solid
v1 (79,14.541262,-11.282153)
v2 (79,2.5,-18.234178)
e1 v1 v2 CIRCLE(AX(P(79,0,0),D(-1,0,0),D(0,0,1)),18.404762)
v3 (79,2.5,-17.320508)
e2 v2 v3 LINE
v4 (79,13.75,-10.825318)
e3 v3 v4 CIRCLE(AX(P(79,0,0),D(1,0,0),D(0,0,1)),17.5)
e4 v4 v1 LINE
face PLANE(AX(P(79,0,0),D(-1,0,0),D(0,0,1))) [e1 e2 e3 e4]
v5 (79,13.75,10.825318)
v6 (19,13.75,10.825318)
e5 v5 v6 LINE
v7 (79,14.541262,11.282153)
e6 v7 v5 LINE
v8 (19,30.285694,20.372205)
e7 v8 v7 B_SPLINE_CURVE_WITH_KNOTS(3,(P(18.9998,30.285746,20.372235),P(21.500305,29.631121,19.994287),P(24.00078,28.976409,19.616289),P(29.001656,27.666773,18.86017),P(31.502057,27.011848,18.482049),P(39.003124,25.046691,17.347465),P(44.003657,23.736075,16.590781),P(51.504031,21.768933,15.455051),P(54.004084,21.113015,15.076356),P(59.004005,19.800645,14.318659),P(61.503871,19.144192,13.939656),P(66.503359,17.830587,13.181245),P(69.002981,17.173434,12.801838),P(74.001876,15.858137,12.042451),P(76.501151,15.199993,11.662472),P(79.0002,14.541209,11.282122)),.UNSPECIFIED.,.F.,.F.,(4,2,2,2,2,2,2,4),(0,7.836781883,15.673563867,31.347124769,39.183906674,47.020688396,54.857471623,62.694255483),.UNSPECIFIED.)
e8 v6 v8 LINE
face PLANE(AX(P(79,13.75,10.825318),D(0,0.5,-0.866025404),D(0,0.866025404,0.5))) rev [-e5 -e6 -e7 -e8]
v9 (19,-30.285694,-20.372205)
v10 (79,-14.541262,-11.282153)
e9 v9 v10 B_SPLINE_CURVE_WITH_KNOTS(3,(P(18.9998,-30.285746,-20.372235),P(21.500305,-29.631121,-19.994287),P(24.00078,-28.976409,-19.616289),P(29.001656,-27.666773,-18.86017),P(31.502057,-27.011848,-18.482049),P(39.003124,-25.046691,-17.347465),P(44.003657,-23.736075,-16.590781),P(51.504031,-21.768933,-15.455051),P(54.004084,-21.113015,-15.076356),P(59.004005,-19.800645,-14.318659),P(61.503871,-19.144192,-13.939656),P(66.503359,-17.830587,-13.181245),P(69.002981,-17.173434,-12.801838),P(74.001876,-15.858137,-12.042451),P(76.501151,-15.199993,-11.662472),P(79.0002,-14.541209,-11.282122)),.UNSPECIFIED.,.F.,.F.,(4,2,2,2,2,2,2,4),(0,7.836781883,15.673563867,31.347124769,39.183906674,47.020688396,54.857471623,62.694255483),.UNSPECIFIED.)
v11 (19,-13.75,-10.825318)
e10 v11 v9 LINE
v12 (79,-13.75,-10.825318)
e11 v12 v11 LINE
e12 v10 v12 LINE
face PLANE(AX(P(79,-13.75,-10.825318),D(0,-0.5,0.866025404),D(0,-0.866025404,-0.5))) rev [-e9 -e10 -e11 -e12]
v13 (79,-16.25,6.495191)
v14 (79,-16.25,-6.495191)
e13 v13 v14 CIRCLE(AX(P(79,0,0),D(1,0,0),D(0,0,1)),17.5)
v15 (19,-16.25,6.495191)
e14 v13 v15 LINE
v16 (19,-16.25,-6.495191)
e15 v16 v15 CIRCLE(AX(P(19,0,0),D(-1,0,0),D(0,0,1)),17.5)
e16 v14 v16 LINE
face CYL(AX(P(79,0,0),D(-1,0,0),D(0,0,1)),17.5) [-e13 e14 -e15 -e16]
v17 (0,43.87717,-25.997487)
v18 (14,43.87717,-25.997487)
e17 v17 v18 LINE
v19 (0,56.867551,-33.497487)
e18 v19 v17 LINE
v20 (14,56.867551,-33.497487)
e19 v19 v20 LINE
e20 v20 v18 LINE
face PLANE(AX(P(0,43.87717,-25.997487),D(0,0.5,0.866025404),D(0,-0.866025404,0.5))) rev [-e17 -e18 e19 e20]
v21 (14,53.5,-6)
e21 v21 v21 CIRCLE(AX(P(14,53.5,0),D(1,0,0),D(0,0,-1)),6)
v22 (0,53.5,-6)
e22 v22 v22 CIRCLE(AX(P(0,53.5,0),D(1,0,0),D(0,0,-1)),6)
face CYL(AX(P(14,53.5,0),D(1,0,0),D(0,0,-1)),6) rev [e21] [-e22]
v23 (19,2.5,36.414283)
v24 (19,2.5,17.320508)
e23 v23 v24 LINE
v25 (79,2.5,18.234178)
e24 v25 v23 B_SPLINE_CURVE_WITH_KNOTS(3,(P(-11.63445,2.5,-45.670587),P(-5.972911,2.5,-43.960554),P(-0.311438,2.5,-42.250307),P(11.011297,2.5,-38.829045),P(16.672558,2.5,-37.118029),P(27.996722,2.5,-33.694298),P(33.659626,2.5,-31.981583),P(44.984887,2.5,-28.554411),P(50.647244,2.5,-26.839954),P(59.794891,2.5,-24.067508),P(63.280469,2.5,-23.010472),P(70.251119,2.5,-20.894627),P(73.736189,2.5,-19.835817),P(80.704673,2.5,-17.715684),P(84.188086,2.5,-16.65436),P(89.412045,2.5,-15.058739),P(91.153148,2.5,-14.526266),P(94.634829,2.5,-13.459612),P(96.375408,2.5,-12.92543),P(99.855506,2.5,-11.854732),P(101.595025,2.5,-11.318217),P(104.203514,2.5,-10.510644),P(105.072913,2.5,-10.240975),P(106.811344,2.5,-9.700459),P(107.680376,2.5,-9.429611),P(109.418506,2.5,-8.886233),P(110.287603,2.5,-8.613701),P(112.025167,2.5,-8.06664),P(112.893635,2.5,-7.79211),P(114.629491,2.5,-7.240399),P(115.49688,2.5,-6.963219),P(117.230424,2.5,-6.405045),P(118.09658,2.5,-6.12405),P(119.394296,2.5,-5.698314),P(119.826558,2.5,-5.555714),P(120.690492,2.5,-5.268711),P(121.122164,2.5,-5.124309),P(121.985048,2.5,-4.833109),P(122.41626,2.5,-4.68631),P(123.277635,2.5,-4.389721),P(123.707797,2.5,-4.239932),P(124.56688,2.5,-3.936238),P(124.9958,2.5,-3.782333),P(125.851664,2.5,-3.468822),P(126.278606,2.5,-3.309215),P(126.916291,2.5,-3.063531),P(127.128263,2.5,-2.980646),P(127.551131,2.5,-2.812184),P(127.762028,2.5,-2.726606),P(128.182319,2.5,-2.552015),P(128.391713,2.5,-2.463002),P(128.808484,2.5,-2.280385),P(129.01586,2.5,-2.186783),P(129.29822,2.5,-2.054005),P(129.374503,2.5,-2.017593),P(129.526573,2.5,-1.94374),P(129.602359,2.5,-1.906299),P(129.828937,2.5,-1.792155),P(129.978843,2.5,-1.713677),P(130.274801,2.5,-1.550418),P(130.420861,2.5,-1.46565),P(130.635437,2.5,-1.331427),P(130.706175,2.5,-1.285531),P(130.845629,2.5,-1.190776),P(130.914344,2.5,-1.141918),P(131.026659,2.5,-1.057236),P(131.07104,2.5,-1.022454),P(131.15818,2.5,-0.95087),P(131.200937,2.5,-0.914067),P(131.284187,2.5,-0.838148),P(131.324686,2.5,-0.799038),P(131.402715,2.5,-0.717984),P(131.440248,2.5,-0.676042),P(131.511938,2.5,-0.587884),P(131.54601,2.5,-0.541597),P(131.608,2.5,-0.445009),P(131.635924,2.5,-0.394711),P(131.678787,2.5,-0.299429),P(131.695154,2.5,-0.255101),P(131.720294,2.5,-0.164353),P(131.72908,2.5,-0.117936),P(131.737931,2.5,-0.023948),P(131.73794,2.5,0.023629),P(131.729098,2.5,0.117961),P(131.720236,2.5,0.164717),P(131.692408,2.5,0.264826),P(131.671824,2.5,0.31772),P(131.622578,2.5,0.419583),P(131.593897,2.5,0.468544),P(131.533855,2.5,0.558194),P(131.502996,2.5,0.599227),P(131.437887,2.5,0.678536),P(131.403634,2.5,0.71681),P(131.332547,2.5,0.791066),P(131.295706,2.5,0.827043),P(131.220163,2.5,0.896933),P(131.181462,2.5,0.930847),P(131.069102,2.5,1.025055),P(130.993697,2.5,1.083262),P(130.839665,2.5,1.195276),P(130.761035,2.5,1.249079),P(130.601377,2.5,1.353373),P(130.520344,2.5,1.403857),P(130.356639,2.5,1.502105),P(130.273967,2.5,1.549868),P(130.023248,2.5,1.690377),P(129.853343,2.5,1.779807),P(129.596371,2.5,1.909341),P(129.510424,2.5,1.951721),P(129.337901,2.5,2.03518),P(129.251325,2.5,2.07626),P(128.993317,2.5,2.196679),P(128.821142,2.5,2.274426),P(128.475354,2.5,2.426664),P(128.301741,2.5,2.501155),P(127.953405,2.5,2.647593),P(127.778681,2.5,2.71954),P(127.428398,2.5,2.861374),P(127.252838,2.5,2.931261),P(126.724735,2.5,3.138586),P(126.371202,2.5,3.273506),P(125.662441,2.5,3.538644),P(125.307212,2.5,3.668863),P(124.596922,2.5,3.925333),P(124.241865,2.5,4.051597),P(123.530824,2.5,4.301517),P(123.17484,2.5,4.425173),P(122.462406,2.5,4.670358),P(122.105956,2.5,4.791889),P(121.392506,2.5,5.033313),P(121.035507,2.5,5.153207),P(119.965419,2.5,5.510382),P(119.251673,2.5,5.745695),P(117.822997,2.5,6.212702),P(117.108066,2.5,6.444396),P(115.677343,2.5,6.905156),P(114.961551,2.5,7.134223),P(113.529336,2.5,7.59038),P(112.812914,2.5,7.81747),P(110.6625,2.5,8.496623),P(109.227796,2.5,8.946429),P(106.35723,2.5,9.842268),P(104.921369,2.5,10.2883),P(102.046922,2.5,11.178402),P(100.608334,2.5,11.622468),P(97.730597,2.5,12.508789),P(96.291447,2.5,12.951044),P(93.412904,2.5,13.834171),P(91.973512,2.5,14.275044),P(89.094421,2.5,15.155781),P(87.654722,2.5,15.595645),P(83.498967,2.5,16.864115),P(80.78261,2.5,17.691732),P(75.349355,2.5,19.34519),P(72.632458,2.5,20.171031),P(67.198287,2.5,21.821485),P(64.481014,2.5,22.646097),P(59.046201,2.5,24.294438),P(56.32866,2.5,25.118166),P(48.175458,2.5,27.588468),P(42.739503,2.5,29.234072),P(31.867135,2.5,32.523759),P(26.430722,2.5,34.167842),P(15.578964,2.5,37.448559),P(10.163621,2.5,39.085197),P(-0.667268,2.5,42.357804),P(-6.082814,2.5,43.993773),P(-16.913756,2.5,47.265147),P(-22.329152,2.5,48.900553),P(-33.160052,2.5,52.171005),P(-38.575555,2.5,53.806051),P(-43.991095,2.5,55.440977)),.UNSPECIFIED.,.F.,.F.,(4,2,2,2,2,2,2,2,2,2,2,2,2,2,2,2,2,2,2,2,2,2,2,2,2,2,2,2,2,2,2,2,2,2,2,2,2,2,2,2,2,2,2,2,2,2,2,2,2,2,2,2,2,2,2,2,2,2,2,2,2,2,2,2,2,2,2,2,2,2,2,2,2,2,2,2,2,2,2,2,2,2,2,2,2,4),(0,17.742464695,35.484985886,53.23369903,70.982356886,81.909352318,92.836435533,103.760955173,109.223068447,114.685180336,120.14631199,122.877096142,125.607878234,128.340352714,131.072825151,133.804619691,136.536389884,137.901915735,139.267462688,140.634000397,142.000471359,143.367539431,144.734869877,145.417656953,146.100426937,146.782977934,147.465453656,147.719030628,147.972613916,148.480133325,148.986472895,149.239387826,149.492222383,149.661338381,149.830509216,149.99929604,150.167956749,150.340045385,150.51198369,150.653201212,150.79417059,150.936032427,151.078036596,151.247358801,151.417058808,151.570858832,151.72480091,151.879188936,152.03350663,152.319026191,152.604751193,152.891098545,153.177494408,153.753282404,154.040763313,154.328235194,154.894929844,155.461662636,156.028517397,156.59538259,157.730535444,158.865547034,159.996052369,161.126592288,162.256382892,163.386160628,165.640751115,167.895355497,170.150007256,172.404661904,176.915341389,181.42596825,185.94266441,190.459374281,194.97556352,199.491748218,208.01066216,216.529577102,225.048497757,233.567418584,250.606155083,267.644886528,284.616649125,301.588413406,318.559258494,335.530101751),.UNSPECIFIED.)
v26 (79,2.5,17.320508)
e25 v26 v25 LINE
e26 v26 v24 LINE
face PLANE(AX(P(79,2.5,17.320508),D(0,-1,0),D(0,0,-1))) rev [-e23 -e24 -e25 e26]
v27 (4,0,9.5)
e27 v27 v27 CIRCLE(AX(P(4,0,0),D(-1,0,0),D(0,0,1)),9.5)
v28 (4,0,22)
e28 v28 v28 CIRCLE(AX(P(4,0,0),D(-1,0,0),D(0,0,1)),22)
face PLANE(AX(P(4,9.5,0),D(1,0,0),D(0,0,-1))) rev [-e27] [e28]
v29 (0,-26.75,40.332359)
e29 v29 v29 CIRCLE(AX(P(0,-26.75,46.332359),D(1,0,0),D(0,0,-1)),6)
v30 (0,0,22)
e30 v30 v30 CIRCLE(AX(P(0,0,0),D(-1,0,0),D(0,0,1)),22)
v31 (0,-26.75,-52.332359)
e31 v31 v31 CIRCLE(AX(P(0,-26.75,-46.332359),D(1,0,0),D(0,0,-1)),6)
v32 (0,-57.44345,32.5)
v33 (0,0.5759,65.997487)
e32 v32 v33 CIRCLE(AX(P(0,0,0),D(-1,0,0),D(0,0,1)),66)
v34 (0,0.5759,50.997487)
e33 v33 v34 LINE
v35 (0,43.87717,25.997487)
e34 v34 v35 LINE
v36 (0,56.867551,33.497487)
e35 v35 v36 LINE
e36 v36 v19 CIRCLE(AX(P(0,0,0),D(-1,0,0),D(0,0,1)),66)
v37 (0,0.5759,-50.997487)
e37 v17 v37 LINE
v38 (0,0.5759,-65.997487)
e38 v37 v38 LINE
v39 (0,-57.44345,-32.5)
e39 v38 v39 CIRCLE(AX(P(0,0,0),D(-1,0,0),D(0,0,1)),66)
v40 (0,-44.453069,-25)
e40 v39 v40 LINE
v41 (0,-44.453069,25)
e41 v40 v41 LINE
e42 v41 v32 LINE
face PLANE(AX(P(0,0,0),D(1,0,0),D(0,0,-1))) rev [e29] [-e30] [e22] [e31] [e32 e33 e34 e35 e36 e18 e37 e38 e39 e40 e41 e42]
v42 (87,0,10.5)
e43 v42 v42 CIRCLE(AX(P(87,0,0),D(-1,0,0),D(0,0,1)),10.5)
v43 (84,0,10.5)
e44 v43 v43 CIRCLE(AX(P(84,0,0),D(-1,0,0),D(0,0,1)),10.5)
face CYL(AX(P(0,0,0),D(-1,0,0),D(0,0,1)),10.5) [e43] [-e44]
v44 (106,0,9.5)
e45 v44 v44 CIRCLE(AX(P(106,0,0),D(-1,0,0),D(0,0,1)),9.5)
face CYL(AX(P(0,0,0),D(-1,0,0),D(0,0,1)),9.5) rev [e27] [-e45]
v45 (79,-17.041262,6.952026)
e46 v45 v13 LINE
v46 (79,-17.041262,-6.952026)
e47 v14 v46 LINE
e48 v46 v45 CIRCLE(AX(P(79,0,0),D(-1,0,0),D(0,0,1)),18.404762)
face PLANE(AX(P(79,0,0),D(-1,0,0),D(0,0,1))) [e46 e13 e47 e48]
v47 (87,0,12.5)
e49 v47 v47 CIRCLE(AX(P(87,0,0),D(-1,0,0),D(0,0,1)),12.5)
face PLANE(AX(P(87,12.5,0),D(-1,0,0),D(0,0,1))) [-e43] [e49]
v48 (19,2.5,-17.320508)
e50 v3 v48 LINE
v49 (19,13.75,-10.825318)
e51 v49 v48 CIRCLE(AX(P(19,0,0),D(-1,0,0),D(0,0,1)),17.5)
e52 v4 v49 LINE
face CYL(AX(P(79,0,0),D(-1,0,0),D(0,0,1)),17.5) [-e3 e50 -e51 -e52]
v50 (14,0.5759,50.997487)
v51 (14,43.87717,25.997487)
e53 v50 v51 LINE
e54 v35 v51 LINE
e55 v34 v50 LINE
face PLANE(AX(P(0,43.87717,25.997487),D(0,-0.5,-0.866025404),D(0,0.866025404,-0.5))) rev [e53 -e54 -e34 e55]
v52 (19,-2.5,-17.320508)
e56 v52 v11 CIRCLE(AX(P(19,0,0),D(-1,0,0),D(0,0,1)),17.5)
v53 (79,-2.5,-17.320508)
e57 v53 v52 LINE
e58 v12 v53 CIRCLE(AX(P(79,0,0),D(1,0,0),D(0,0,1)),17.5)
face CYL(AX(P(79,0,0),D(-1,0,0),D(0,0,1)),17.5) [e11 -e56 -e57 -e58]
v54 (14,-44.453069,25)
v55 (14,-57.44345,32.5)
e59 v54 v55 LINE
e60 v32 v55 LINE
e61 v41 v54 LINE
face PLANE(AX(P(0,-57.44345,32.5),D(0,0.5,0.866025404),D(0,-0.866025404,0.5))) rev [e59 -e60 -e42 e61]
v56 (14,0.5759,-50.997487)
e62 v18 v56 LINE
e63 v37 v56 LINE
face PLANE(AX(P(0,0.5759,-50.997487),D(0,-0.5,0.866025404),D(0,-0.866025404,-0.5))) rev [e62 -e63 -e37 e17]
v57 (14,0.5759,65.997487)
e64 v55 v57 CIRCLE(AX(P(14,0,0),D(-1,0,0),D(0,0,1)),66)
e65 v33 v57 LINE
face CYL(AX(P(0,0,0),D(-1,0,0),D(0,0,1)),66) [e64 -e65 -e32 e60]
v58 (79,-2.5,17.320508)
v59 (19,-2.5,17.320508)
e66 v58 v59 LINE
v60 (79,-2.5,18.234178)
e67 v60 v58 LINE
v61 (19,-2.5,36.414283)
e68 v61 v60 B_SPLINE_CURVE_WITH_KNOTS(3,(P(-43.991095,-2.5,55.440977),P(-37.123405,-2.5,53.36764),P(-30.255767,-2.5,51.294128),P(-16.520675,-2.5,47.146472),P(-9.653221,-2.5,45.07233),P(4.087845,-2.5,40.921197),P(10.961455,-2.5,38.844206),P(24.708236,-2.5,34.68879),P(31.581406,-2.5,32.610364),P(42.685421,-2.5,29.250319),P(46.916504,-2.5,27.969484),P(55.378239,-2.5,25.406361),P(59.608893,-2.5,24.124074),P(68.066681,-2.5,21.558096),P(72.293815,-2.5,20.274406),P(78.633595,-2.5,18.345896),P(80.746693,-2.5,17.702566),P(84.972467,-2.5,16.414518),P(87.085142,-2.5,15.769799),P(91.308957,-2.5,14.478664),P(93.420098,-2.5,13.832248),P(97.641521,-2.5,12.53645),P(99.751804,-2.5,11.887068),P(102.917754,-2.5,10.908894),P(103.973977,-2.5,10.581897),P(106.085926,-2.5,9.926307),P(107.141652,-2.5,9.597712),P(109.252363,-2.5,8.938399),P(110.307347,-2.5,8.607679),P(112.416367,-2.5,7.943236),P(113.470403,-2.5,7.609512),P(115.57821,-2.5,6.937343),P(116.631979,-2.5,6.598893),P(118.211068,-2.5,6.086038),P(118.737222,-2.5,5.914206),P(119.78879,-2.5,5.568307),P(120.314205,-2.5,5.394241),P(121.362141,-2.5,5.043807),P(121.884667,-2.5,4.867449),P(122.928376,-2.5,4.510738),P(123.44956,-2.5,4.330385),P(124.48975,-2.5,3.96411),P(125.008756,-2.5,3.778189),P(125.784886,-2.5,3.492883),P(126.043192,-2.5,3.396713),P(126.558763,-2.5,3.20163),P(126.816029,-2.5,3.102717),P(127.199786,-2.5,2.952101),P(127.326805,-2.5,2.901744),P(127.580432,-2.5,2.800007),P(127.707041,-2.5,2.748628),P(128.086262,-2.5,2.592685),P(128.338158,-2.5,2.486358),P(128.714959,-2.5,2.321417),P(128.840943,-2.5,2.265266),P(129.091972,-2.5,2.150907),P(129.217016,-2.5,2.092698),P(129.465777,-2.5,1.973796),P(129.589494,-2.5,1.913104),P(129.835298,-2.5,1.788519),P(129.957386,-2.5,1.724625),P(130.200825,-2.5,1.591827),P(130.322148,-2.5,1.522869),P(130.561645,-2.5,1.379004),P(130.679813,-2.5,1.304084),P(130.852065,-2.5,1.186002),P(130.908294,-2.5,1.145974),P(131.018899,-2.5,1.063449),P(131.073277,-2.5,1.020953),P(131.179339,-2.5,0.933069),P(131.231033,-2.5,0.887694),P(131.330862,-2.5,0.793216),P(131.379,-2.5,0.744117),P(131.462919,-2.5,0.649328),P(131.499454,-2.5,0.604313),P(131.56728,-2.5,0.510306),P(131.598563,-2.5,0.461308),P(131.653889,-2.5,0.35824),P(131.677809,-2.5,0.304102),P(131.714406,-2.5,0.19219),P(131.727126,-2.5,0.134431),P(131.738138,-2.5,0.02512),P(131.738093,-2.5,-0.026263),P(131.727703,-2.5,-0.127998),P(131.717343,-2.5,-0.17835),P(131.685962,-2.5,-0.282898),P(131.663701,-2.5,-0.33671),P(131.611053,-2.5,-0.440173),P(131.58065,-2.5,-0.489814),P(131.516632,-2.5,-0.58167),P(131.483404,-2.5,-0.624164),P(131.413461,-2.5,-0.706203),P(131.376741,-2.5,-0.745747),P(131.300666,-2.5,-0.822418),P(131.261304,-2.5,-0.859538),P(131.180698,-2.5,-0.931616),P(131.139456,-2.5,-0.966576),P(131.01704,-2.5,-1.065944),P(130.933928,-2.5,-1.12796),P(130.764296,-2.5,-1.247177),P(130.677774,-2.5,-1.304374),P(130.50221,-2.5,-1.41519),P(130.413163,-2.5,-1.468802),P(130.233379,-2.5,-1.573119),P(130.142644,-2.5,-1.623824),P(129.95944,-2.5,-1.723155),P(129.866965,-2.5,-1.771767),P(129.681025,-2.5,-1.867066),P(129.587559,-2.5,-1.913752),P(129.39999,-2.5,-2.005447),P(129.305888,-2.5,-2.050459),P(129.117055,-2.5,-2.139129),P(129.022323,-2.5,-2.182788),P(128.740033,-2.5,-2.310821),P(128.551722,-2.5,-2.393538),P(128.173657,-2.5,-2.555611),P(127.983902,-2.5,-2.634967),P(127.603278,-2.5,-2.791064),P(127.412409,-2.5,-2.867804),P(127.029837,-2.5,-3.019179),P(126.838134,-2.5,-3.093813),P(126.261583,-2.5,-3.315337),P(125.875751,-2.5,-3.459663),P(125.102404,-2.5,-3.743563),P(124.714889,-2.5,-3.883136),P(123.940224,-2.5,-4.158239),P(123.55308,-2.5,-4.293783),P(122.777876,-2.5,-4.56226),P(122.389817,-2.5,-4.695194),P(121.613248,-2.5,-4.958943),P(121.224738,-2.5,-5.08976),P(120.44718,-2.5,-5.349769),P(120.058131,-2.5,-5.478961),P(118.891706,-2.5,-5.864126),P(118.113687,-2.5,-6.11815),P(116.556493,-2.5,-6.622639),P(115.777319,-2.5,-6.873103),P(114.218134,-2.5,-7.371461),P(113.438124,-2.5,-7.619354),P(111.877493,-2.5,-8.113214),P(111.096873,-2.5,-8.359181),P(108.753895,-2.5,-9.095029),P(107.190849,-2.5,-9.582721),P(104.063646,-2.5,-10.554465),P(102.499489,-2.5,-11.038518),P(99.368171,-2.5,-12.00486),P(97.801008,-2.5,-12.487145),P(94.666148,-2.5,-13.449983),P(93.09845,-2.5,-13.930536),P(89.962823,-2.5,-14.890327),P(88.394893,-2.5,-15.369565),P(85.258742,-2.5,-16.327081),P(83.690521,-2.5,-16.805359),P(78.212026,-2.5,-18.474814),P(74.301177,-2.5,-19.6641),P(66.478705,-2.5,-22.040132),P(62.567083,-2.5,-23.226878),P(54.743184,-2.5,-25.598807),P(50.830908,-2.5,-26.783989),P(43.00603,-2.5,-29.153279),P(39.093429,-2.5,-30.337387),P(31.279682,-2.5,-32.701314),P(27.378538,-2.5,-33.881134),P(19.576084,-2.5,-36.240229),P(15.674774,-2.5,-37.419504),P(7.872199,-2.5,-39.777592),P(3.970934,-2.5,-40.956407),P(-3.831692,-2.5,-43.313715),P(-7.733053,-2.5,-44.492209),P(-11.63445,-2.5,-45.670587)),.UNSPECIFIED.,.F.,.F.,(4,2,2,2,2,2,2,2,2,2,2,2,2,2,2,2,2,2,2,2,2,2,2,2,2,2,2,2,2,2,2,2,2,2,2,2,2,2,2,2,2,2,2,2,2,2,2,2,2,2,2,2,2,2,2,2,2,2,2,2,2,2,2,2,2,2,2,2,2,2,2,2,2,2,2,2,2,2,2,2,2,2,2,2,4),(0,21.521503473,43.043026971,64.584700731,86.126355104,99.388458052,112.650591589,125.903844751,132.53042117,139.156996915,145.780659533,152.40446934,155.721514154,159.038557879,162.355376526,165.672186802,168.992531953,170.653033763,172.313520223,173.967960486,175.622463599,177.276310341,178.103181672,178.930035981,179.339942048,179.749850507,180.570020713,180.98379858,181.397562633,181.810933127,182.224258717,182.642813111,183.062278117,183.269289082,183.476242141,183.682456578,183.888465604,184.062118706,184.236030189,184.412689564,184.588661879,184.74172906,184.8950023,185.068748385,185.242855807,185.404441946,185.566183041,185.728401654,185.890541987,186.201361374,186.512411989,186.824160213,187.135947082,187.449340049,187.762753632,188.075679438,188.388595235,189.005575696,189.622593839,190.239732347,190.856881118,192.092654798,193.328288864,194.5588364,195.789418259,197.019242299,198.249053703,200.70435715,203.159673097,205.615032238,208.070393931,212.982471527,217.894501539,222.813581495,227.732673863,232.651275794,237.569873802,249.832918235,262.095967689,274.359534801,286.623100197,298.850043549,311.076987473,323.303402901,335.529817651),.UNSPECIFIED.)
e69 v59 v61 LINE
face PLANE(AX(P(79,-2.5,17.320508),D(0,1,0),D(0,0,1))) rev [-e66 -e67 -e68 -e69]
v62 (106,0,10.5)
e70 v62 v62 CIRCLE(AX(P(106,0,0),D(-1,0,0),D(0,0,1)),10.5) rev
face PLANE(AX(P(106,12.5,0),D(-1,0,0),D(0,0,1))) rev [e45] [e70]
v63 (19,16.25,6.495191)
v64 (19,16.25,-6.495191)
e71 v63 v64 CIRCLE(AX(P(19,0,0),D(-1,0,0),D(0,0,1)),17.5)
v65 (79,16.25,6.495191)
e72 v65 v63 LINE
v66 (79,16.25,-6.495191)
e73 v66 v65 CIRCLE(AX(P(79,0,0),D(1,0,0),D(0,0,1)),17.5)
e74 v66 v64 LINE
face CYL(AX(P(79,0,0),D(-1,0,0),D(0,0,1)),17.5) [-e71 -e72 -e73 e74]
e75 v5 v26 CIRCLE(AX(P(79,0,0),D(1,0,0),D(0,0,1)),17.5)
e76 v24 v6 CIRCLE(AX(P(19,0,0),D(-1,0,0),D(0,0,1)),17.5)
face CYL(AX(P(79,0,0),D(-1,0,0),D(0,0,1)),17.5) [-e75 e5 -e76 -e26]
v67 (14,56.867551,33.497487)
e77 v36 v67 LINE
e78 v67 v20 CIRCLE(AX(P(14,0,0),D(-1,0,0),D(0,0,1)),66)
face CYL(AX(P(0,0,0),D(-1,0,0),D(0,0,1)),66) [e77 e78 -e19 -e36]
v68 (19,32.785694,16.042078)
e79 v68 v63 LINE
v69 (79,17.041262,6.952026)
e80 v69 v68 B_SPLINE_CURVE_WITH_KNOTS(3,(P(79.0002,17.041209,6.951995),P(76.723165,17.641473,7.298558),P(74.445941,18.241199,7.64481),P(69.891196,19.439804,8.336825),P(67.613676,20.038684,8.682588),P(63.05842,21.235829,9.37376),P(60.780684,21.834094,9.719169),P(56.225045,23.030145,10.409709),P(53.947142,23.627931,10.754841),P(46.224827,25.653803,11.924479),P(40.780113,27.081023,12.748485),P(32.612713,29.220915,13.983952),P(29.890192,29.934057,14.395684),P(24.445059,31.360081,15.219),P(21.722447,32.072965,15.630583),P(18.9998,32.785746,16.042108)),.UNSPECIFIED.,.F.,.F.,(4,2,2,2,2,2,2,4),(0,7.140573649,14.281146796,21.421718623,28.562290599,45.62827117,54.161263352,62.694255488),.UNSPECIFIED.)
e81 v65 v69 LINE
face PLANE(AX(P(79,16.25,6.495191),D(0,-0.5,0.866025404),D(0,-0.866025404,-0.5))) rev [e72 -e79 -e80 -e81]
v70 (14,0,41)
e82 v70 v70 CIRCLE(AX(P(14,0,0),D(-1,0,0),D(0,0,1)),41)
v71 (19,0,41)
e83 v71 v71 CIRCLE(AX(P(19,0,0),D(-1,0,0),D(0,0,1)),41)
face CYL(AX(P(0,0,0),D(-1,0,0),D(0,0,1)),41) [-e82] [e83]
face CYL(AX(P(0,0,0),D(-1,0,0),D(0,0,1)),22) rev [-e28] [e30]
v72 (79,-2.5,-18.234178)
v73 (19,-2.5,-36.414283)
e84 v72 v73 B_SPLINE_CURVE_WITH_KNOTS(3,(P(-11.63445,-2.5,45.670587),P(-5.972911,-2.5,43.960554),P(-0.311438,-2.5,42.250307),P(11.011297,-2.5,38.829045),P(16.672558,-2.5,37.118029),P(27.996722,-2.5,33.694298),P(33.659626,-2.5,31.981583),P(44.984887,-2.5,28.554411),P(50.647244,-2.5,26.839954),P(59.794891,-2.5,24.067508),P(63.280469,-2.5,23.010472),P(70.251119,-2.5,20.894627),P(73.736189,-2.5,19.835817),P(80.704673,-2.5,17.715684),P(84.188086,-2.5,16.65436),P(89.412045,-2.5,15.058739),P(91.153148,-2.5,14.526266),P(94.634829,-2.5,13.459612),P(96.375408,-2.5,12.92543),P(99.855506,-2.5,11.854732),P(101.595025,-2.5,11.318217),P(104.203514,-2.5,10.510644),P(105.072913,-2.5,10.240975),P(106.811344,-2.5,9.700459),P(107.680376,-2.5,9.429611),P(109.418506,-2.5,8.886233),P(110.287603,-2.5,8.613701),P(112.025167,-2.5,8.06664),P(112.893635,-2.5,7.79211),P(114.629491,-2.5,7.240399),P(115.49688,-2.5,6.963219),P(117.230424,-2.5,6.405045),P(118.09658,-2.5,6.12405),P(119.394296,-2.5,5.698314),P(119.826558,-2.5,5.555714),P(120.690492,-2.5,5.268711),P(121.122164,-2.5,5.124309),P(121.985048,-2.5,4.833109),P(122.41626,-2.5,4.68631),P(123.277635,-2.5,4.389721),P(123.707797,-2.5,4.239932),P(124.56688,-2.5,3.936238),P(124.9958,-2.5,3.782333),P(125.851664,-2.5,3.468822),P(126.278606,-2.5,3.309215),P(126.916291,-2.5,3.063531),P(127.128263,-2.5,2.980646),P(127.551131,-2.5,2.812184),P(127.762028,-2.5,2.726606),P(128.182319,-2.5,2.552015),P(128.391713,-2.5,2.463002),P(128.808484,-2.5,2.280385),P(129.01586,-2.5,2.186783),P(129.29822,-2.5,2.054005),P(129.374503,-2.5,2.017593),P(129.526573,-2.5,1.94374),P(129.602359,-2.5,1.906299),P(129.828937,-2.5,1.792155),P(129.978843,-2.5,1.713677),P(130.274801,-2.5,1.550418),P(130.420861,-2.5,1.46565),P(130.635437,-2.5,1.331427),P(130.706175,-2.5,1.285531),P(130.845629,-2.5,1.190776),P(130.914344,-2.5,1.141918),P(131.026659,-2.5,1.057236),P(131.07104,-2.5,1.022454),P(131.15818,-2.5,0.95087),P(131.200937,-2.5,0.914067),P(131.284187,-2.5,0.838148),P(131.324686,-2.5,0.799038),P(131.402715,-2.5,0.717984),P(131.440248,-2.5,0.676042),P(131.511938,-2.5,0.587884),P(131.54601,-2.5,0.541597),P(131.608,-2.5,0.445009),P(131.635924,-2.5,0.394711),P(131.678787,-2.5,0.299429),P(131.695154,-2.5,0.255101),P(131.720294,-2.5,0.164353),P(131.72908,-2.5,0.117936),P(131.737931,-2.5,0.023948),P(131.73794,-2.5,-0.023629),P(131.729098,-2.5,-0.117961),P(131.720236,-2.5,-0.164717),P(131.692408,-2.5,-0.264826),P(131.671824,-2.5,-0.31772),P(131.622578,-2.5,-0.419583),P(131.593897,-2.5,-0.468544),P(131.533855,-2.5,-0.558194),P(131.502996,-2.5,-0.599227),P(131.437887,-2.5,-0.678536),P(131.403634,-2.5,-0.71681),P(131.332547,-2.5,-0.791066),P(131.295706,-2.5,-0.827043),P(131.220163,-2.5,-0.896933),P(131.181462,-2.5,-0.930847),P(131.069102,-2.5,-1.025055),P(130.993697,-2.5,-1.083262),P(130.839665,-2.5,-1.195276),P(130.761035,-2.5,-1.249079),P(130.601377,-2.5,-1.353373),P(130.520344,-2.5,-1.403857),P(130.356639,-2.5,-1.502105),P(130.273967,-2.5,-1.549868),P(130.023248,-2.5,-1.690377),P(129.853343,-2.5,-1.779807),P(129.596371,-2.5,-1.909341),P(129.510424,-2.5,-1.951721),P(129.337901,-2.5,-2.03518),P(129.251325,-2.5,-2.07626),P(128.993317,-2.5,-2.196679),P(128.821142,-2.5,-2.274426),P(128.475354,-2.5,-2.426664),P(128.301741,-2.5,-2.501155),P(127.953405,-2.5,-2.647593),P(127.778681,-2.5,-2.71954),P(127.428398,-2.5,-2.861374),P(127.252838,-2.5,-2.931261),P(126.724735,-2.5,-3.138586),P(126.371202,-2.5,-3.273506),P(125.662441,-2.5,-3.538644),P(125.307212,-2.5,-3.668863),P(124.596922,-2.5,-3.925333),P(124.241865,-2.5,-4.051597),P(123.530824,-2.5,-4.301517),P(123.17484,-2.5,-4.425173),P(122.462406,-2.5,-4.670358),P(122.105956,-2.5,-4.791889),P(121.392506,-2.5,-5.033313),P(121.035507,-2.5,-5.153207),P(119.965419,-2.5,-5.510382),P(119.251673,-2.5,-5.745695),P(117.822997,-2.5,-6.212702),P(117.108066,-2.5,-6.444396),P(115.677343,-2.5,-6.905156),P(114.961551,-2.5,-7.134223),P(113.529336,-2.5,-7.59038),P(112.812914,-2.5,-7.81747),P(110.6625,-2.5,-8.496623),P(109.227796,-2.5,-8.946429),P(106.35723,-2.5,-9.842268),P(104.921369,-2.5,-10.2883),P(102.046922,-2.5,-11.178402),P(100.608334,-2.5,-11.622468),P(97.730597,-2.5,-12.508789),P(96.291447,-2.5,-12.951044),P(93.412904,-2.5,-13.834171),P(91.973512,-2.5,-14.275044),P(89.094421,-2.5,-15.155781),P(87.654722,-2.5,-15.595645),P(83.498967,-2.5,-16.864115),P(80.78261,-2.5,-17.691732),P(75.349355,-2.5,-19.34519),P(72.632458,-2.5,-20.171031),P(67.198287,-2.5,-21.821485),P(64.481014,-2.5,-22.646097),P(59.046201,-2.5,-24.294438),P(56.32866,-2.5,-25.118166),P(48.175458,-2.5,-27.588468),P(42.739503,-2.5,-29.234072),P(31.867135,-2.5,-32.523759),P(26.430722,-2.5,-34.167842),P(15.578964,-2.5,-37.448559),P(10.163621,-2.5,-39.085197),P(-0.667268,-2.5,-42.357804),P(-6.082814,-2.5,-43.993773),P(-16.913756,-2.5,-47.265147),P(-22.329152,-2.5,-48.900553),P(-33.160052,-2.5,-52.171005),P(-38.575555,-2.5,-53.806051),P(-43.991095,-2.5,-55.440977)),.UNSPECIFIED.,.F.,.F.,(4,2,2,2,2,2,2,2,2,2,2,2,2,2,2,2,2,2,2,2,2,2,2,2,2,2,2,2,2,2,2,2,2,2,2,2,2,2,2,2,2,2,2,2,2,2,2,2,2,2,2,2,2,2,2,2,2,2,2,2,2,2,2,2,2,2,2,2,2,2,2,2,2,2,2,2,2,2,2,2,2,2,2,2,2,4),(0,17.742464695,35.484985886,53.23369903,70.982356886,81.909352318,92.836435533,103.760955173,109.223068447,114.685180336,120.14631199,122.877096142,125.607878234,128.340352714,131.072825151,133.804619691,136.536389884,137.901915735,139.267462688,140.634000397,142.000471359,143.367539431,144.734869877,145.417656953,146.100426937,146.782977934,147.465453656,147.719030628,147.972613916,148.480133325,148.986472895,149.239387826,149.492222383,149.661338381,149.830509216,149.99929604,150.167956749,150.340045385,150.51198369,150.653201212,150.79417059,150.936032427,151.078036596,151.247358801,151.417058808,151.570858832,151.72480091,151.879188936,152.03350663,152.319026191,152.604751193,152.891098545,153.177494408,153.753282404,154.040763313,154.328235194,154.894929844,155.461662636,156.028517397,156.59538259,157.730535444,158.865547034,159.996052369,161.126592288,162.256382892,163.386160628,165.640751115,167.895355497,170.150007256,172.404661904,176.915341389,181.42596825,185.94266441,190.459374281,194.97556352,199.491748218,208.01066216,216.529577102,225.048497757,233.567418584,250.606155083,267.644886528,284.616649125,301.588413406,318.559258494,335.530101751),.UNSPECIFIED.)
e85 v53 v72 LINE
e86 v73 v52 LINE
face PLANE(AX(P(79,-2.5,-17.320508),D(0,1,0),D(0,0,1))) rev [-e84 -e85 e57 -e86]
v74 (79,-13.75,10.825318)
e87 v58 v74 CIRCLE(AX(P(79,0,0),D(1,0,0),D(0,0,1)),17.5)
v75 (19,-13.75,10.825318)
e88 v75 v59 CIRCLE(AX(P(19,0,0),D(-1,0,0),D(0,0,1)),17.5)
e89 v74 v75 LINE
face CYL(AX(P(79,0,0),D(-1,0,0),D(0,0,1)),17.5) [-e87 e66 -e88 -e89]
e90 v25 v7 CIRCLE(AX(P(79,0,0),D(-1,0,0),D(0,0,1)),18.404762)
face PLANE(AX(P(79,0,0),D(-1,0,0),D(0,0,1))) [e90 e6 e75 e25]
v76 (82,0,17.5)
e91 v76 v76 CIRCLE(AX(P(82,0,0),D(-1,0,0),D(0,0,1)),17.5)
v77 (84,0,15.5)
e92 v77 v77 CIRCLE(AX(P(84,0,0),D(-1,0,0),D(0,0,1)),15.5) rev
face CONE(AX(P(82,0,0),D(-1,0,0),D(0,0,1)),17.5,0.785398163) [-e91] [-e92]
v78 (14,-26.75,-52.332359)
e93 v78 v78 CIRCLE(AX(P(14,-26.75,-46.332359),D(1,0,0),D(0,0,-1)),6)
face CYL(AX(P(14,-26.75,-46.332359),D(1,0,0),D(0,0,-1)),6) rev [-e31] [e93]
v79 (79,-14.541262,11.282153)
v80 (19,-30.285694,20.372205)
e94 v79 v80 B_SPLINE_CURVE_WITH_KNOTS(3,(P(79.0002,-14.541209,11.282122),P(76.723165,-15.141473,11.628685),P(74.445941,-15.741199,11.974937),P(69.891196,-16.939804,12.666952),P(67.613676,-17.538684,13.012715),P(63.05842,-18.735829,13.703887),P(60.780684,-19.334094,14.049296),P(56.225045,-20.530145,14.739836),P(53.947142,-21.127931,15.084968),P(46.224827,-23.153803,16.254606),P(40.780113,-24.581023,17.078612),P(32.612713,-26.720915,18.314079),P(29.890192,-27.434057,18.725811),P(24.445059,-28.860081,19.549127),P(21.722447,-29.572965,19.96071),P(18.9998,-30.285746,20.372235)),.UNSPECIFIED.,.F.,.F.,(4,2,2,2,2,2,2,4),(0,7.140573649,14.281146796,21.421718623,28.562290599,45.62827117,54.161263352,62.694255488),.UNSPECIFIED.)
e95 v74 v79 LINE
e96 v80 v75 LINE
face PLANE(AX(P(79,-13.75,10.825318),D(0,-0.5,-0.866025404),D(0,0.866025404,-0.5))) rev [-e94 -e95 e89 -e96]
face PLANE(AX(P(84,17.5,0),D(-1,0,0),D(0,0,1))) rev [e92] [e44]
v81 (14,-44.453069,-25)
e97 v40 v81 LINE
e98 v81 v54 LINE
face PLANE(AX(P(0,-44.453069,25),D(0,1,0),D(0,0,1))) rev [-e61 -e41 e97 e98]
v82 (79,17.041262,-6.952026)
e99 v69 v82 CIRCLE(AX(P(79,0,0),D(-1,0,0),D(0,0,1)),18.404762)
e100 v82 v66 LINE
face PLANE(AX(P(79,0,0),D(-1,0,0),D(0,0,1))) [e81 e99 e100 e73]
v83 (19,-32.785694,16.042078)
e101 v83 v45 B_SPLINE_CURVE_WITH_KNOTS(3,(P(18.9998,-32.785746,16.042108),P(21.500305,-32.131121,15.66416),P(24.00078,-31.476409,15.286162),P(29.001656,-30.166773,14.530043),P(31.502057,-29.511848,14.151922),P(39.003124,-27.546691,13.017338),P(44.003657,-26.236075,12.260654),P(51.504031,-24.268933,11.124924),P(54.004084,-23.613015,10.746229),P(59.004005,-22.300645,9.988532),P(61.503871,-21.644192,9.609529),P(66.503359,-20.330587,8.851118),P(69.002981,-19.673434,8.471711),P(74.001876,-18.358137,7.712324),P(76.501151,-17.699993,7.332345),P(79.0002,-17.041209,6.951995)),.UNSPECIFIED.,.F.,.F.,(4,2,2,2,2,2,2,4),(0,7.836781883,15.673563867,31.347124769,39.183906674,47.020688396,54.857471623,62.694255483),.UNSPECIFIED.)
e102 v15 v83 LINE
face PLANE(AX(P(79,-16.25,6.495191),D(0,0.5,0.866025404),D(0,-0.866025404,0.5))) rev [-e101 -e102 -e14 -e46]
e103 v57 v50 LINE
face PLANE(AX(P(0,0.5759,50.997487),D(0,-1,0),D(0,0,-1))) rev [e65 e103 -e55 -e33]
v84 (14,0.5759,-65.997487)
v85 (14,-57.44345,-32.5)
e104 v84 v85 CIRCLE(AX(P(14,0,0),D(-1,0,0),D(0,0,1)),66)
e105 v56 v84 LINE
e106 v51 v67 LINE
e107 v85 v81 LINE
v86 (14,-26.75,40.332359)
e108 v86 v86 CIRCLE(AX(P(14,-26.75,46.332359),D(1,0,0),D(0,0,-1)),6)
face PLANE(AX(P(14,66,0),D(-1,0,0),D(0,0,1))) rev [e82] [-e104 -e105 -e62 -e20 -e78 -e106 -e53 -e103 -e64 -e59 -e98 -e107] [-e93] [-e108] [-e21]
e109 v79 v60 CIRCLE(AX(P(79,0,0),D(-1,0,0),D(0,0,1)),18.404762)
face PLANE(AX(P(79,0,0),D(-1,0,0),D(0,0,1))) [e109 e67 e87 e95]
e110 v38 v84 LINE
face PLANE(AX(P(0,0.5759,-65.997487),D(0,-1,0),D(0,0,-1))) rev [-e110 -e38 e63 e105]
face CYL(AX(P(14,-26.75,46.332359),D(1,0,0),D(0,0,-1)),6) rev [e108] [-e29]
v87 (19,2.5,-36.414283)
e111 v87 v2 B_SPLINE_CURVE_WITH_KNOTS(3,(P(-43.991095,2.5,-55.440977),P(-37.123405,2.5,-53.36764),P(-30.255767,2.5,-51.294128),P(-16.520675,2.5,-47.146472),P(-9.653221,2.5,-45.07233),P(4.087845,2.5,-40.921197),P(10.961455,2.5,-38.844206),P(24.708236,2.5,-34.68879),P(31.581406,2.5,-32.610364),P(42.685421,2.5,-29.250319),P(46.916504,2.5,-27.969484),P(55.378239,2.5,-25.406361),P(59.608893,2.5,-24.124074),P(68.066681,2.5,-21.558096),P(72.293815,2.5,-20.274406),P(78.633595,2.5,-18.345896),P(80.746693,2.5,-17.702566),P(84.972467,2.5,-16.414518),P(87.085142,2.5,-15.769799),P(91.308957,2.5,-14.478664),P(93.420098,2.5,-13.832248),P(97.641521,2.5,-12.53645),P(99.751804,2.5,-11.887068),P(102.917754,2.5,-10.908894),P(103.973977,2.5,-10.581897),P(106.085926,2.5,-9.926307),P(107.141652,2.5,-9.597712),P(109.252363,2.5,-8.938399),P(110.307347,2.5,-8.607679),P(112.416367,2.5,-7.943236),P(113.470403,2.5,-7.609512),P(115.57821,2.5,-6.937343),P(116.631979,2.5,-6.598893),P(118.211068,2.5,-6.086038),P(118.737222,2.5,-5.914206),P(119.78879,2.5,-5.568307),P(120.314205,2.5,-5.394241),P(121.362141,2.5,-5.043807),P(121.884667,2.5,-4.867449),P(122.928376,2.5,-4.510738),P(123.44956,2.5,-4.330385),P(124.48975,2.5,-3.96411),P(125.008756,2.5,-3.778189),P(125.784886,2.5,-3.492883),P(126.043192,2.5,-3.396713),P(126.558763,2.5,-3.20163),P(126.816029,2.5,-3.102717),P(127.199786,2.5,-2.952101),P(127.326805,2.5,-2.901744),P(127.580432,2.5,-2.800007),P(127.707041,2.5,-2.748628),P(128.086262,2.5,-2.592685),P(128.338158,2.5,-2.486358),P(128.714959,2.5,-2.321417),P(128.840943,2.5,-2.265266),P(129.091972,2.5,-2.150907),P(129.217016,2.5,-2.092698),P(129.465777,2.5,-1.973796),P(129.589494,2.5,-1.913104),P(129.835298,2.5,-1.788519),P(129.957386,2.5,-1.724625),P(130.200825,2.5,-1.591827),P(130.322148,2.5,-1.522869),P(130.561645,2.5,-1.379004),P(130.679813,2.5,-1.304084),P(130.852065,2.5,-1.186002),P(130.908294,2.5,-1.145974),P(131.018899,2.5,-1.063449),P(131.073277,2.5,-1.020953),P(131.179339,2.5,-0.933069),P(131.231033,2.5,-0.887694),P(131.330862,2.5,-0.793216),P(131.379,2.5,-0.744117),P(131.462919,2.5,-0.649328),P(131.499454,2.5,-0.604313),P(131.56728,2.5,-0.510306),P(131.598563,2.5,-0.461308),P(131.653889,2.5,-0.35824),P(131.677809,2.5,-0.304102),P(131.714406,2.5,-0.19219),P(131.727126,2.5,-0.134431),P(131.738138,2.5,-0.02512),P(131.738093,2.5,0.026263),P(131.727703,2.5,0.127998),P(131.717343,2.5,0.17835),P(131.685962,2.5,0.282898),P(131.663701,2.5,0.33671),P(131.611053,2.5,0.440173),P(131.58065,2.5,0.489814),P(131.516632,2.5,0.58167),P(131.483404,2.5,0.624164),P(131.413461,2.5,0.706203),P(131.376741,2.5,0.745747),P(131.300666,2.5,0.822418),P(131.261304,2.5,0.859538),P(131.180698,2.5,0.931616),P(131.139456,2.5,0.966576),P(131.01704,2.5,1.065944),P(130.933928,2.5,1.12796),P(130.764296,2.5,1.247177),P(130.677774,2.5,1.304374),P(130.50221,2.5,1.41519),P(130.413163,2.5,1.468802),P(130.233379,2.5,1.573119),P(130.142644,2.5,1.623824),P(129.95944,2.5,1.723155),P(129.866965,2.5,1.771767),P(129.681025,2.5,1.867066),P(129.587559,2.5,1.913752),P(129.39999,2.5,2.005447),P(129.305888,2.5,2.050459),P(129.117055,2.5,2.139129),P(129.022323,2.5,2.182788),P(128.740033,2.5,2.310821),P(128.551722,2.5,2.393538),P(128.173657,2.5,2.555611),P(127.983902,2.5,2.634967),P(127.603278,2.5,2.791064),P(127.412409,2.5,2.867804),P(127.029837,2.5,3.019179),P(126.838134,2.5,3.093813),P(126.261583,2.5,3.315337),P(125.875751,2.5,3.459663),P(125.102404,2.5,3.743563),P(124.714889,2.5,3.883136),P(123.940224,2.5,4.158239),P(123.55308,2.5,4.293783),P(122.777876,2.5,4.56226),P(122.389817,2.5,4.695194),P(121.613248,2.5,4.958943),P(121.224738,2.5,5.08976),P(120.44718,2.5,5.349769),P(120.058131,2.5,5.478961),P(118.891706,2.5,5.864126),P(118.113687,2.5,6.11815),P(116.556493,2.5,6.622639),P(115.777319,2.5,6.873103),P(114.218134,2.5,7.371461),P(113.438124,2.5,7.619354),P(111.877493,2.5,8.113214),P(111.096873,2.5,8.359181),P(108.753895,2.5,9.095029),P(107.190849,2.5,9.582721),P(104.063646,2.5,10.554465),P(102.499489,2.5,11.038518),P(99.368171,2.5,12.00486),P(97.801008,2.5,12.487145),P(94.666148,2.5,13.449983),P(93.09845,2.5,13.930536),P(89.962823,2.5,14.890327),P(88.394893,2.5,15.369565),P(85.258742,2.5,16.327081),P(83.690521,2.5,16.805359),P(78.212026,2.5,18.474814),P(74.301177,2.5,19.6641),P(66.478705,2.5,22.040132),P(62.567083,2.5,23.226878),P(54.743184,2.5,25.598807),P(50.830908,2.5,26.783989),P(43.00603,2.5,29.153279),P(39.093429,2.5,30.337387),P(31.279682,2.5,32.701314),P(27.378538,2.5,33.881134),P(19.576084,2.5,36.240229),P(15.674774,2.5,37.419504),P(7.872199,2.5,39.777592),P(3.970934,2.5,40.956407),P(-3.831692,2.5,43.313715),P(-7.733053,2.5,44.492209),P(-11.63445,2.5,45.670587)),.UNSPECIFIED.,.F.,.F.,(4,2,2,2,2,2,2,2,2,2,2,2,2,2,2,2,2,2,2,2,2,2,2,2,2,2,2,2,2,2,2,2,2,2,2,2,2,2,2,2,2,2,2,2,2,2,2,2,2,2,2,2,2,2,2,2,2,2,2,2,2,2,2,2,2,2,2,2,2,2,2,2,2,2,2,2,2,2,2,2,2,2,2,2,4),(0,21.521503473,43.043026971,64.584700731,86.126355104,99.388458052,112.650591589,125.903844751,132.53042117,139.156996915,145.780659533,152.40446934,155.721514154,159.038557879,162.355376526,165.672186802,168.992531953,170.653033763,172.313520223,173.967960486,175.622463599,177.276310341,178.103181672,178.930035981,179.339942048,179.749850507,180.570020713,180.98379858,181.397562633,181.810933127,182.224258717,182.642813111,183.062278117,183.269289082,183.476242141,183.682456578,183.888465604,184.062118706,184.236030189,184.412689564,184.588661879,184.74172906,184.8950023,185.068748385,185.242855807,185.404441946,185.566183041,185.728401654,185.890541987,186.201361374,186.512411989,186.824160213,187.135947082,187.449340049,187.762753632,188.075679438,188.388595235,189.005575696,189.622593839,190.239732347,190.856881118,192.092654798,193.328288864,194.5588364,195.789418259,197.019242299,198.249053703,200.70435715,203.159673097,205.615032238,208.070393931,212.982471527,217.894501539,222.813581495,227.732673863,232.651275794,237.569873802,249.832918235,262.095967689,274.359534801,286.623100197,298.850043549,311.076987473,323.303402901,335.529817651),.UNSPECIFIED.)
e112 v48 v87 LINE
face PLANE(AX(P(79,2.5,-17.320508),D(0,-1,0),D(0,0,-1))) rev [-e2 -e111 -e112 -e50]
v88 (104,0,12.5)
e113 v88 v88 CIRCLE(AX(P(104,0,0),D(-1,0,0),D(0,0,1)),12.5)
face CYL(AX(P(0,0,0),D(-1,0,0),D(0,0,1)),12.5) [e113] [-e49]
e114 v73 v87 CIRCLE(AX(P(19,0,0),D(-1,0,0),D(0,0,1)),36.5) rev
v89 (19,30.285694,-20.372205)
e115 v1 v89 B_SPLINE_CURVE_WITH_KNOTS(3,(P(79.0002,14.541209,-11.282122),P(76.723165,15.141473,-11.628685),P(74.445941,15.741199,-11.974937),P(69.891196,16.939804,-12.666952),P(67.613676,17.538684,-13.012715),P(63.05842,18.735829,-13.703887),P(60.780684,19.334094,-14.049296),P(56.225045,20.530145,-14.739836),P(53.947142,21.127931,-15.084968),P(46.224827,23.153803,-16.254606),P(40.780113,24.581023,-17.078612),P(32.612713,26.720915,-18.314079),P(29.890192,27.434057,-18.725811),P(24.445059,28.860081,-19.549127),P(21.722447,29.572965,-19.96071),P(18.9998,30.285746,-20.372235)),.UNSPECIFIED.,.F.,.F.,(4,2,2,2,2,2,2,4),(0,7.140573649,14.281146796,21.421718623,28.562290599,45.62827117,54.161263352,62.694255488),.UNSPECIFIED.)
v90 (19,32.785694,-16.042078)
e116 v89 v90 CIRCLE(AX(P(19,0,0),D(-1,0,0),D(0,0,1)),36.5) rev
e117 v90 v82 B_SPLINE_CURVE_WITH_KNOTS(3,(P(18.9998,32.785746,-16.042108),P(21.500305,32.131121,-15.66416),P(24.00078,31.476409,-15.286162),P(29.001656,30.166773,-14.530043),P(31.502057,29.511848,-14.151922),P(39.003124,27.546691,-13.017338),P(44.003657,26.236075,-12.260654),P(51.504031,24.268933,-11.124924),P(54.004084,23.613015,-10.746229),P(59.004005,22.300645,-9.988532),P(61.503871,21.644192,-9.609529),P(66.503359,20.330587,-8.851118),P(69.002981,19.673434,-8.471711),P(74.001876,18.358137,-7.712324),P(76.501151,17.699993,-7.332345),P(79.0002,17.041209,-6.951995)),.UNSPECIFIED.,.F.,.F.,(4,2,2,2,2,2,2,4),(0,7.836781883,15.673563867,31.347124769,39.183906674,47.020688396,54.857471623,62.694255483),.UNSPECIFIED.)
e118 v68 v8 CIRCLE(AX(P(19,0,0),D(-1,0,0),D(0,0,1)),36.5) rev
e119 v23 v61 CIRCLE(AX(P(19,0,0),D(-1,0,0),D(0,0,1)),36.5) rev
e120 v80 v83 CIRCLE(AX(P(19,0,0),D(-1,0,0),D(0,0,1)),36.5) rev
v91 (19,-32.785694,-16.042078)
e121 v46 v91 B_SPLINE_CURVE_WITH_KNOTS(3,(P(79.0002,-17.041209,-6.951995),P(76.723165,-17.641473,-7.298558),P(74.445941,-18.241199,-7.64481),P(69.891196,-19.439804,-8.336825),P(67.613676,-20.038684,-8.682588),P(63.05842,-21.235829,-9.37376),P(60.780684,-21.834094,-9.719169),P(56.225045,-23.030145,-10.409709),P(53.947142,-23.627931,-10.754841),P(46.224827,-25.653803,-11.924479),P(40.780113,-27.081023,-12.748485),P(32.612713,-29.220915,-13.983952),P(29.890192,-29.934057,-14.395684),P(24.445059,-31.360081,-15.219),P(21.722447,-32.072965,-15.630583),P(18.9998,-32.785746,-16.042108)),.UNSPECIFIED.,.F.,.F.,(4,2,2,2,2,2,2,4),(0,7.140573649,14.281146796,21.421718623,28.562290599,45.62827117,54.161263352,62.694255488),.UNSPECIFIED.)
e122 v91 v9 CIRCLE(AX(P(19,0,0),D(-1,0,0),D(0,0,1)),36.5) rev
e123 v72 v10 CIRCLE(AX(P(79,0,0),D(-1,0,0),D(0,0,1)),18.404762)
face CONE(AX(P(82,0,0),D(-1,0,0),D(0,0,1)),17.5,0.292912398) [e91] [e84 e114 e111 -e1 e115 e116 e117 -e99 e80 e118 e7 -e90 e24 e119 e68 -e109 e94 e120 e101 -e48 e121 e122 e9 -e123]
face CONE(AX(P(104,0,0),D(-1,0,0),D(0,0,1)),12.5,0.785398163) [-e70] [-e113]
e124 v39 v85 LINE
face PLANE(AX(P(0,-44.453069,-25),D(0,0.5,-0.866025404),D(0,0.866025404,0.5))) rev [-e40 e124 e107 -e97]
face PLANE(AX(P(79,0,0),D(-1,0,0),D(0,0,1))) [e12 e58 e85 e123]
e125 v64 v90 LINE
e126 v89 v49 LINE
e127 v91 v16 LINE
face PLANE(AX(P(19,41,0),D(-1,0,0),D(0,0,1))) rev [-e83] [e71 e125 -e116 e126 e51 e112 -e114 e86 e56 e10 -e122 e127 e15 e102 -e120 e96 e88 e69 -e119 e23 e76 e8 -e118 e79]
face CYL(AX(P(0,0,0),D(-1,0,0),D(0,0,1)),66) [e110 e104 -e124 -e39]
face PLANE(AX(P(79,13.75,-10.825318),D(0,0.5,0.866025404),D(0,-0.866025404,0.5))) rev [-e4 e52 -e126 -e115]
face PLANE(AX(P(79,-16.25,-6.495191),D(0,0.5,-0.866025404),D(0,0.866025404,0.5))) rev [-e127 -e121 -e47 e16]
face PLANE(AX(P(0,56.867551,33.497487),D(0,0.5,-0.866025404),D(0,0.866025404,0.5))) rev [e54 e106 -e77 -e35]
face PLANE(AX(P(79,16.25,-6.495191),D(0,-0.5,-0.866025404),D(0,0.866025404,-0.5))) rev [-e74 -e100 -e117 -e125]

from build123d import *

# Parameters (mm, degrees)
SKETCH2_W           = 3
SKETCH2_H           = 2
CHAMFER1_SIZE       = 2
CUT_EXTRUDE1_DEPTH  = 132.057239403
CIRPATTERN1_COUNT   = 3
HOLE1_D             = 12
CIRPATTERN2_COUNT   = 3
CUT_EXTRUDE2_START  = -79
CUT_EXTRUDE2_DEPTH  = 79
BOSS_EXTRUDE2_START = -19
SKETCH9_R           = 41
BOSS_EXTRUDE2_DEPTH = 19
HOLE3_D             = 19
HOLE3_CBORE_D       = 44
HOLE3_CBORE_DEPTH   = 4


with BuildPart() as part:
    # Sketch1 → Revolve3 (revolve)
    with BuildSketch(Plane.XY, mode=Mode.PRIVATE) as revolve3_sk:
        Polygon((0, 0), (0, 66), (14, 66), (14, 41), (19, 41), (19, 17.5), (84, 17.5), (84, 12.5), (106, 12.5), (106, 0), align=None)
    revolve(revolve3_sk.sketch.rotate(Axis((0, 0, 0), (1, 0, 0)), 90), axis=Axis((0, 0, 0), (1, 0, 0)))

    # Sketch2 → Cut-Revolve1 (revolve, cut)
    with BuildSketch(Plane.XY, mode=Mode.PRIVATE) as cut_revolve1_sk:
        with Locations((85.5, 11.5)):
            Rectangle(SKETCH2_W, SKETCH2_H)
    revolve(cut_revolve1_sk.sketch.rotate(Axis((0, 0, 0), (1, 0, 0)), 90), axis=Axis((0, 0, 0), (1, 0, 0)), mode=Mode.SUBTRACT)

    # Sketch3 → Revolve5 (revolve)
    with BuildSketch(Plane(origin=(0, 0, 0), x_dir=(1, 0, 0), z_dir=(0, 1, 0)), mode=Mode.PRIVATE) as revolve5_sk:
        Polygon((19, 36.5), (82, 17.5), (19, 17.5), align=None)
    revolve(revolve5_sk.sketch.rotate(Axis((0, 0, 0), (1, 0, 0)), 180), axis=Axis((0, 0, 0), (1, 0, 0)))

    # Chamfer1
    chamfer1_edges = [part.edges().sort_by_distance(p)[0] for p in [
        (106, 0, -12.5),
        (84, 0, -17.5),
    ]]
    chamfer(chamfer1_edges, length=CHAMFER1_SIZE - 0.0001)  # a hair under: the kernel refuses the full size

    # Sketch4 → Cut-Extrude1 (cut, through all)
    with BuildSketch(Plane(origin=(14, 0, 0), x_dir=(0, 0, -1), z_dir=(1, 0, 0))):
        with BuildLine():
            Line((-32.5, -57.443450453), (-25, -44.453069397))
            Line((-25, -44.453069397), (25, -44.453069397))
            Line((25, -44.453069397), (32.5, -57.443450453))
            ThreePointArc((32.5, -57.443450453), (0, -66), (-32.5, -57.443450453))
        make_face()
    cut_extrude1 = extrude(amount=-CUT_EXTRUDE1_DEPTH, mode=Mode.SUBTRACT)

    # CirPattern1: Cut-Extrude1 ×3 about axis
    cirpattern1_axis = Axis((0, 0, 0), (1, 0, 0))
    for i in range(1, CIRPATTERN1_COUNT):
        add(cut_extrude1.rotate(cirpattern1_axis, i * 360 / CIRPATTERN1_COUNT), mode=Mode.SUBTRACT)

    # Hole1 (through all)
    with Locations(Plane(origin=(14, 0, 0), x_dir=(0, 0, -1), z_dir=(1, 0, 0))):
        with Locations((0, 53.5)):
            hole1 = Hole(HOLE1_D / 2)

    # CirPattern2: Hole1 ×3 about axis
    cirpattern2_axis = Axis((0, 0, 0), (1, 0, 0))
    for i in range(1, CIRPATTERN2_COUNT):
        add(hole1.rotate(cirpattern2_axis, i * 360 / CIRPATTERN2_COUNT), mode=Mode.SUBTRACT)

    # Sketch7 → Cut-Extrude2 (cut)
    with BuildSketch(Plane.ZY.offset(CUT_EXTRUDE2_START)):
        with BuildLine():
            Line((17.320508076, 2.5), (40.923709509, 2.5))
            ThreePointArc((40.923709509, 2.5), (35.507041555, 20.5), (22.626918264, 34.190972052))
            Line((22.626918264, 34.190972052), (10.825317547, 13.75))
            ThreePointArc((10.825317547, 13.75), (15.155444566, 8.75), (17.320508076, 2.5))
        make_face()
        with BuildLine():
            Line((17.320508076, -2.5), (40.923709509, -2.5))
            ThreePointArc((40.923709509, -2.5), (35.507041555, -20.5), (22.626918264, -34.190972052))
            Line((22.626918264, -34.190972052), (10.825317547, -13.75))
            ThreePointArc((10.825317547, -13.75), (15.155444566, -8.75), (17.320508076, -2.5))
        make_face()
        with BuildLine():
            Line((6.495190528, -16.25), (18.296791245, -36.690972052))
            ThreePointArc((18.296791245, -36.690972052), (0, -41), (-18.296791245, -36.690972052))
            Line((-18.296791245, -36.690972052), (-6.495190528, -16.25))
            ThreePointArc((-6.495190528, -16.25), (0, -17.5), (6.495190528, -16.25))
        make_face()
        with BuildLine():
            Line((-10.825317547, -13.75), (-22.626918264, -34.190972052))
            ThreePointArc((-22.626918264, -34.190972052), (-35.507041555, -20.5), (-40.923709509, -2.5))
            Line((-40.923709509, -2.5), (-17.320508076, -2.5))
            ThreePointArc((-17.320508076, -2.5), (-15.155444566, -8.75), (-10.825317547, -13.75))
        make_face()
        with BuildLine():
            Line((-17.320508076, 2.5), (-40.923709509, 2.5))
            ThreePointArc((-40.923709509, 2.5), (-35.507041555, 20.5), (-22.626918264, 34.190972052))
            Line((-22.626918264, 34.190972052), (-10.825317547, 13.75))
            ThreePointArc((-10.825317547, 13.75), (-15.155444566, 8.75), (-17.320508076, 2.5))
        make_face()
        with BuildLine():
            Line((-6.495190528, 16.25), (-18.296791245, 36.690972052))
            ThreePointArc((-18.296791245, 36.690972052), (0, 41), (18.296791245, 36.690972052))
            Line((18.296791245, 36.690972052), (6.495190528, 16.25))
            ThreePointArc((6.495190528, 16.25), (0, 17.5), (-6.495190528, 16.25))
        make_face()
    extrude(amount=CUT_EXTRUDE2_DEPTH, mode=Mode.SUBTRACT)

    # Sketch9 → Boss-Extrude2 (add)
    with BuildSketch(Plane.ZY.offset(BOSS_EXTRUDE2_START)):
        Circle(SKETCH9_R)
    extrude(amount=BOSS_EXTRUDE2_DEPTH)

    # Hole3 (through all)
    with Locations(Plane.ZY):
        with Locations((0, 0)):
            CounterBoreHole(HOLE3_D / 2, HOLE3_CBORE_D / 2, HOLE3_CBORE_DEPTH)


solid = part.part
